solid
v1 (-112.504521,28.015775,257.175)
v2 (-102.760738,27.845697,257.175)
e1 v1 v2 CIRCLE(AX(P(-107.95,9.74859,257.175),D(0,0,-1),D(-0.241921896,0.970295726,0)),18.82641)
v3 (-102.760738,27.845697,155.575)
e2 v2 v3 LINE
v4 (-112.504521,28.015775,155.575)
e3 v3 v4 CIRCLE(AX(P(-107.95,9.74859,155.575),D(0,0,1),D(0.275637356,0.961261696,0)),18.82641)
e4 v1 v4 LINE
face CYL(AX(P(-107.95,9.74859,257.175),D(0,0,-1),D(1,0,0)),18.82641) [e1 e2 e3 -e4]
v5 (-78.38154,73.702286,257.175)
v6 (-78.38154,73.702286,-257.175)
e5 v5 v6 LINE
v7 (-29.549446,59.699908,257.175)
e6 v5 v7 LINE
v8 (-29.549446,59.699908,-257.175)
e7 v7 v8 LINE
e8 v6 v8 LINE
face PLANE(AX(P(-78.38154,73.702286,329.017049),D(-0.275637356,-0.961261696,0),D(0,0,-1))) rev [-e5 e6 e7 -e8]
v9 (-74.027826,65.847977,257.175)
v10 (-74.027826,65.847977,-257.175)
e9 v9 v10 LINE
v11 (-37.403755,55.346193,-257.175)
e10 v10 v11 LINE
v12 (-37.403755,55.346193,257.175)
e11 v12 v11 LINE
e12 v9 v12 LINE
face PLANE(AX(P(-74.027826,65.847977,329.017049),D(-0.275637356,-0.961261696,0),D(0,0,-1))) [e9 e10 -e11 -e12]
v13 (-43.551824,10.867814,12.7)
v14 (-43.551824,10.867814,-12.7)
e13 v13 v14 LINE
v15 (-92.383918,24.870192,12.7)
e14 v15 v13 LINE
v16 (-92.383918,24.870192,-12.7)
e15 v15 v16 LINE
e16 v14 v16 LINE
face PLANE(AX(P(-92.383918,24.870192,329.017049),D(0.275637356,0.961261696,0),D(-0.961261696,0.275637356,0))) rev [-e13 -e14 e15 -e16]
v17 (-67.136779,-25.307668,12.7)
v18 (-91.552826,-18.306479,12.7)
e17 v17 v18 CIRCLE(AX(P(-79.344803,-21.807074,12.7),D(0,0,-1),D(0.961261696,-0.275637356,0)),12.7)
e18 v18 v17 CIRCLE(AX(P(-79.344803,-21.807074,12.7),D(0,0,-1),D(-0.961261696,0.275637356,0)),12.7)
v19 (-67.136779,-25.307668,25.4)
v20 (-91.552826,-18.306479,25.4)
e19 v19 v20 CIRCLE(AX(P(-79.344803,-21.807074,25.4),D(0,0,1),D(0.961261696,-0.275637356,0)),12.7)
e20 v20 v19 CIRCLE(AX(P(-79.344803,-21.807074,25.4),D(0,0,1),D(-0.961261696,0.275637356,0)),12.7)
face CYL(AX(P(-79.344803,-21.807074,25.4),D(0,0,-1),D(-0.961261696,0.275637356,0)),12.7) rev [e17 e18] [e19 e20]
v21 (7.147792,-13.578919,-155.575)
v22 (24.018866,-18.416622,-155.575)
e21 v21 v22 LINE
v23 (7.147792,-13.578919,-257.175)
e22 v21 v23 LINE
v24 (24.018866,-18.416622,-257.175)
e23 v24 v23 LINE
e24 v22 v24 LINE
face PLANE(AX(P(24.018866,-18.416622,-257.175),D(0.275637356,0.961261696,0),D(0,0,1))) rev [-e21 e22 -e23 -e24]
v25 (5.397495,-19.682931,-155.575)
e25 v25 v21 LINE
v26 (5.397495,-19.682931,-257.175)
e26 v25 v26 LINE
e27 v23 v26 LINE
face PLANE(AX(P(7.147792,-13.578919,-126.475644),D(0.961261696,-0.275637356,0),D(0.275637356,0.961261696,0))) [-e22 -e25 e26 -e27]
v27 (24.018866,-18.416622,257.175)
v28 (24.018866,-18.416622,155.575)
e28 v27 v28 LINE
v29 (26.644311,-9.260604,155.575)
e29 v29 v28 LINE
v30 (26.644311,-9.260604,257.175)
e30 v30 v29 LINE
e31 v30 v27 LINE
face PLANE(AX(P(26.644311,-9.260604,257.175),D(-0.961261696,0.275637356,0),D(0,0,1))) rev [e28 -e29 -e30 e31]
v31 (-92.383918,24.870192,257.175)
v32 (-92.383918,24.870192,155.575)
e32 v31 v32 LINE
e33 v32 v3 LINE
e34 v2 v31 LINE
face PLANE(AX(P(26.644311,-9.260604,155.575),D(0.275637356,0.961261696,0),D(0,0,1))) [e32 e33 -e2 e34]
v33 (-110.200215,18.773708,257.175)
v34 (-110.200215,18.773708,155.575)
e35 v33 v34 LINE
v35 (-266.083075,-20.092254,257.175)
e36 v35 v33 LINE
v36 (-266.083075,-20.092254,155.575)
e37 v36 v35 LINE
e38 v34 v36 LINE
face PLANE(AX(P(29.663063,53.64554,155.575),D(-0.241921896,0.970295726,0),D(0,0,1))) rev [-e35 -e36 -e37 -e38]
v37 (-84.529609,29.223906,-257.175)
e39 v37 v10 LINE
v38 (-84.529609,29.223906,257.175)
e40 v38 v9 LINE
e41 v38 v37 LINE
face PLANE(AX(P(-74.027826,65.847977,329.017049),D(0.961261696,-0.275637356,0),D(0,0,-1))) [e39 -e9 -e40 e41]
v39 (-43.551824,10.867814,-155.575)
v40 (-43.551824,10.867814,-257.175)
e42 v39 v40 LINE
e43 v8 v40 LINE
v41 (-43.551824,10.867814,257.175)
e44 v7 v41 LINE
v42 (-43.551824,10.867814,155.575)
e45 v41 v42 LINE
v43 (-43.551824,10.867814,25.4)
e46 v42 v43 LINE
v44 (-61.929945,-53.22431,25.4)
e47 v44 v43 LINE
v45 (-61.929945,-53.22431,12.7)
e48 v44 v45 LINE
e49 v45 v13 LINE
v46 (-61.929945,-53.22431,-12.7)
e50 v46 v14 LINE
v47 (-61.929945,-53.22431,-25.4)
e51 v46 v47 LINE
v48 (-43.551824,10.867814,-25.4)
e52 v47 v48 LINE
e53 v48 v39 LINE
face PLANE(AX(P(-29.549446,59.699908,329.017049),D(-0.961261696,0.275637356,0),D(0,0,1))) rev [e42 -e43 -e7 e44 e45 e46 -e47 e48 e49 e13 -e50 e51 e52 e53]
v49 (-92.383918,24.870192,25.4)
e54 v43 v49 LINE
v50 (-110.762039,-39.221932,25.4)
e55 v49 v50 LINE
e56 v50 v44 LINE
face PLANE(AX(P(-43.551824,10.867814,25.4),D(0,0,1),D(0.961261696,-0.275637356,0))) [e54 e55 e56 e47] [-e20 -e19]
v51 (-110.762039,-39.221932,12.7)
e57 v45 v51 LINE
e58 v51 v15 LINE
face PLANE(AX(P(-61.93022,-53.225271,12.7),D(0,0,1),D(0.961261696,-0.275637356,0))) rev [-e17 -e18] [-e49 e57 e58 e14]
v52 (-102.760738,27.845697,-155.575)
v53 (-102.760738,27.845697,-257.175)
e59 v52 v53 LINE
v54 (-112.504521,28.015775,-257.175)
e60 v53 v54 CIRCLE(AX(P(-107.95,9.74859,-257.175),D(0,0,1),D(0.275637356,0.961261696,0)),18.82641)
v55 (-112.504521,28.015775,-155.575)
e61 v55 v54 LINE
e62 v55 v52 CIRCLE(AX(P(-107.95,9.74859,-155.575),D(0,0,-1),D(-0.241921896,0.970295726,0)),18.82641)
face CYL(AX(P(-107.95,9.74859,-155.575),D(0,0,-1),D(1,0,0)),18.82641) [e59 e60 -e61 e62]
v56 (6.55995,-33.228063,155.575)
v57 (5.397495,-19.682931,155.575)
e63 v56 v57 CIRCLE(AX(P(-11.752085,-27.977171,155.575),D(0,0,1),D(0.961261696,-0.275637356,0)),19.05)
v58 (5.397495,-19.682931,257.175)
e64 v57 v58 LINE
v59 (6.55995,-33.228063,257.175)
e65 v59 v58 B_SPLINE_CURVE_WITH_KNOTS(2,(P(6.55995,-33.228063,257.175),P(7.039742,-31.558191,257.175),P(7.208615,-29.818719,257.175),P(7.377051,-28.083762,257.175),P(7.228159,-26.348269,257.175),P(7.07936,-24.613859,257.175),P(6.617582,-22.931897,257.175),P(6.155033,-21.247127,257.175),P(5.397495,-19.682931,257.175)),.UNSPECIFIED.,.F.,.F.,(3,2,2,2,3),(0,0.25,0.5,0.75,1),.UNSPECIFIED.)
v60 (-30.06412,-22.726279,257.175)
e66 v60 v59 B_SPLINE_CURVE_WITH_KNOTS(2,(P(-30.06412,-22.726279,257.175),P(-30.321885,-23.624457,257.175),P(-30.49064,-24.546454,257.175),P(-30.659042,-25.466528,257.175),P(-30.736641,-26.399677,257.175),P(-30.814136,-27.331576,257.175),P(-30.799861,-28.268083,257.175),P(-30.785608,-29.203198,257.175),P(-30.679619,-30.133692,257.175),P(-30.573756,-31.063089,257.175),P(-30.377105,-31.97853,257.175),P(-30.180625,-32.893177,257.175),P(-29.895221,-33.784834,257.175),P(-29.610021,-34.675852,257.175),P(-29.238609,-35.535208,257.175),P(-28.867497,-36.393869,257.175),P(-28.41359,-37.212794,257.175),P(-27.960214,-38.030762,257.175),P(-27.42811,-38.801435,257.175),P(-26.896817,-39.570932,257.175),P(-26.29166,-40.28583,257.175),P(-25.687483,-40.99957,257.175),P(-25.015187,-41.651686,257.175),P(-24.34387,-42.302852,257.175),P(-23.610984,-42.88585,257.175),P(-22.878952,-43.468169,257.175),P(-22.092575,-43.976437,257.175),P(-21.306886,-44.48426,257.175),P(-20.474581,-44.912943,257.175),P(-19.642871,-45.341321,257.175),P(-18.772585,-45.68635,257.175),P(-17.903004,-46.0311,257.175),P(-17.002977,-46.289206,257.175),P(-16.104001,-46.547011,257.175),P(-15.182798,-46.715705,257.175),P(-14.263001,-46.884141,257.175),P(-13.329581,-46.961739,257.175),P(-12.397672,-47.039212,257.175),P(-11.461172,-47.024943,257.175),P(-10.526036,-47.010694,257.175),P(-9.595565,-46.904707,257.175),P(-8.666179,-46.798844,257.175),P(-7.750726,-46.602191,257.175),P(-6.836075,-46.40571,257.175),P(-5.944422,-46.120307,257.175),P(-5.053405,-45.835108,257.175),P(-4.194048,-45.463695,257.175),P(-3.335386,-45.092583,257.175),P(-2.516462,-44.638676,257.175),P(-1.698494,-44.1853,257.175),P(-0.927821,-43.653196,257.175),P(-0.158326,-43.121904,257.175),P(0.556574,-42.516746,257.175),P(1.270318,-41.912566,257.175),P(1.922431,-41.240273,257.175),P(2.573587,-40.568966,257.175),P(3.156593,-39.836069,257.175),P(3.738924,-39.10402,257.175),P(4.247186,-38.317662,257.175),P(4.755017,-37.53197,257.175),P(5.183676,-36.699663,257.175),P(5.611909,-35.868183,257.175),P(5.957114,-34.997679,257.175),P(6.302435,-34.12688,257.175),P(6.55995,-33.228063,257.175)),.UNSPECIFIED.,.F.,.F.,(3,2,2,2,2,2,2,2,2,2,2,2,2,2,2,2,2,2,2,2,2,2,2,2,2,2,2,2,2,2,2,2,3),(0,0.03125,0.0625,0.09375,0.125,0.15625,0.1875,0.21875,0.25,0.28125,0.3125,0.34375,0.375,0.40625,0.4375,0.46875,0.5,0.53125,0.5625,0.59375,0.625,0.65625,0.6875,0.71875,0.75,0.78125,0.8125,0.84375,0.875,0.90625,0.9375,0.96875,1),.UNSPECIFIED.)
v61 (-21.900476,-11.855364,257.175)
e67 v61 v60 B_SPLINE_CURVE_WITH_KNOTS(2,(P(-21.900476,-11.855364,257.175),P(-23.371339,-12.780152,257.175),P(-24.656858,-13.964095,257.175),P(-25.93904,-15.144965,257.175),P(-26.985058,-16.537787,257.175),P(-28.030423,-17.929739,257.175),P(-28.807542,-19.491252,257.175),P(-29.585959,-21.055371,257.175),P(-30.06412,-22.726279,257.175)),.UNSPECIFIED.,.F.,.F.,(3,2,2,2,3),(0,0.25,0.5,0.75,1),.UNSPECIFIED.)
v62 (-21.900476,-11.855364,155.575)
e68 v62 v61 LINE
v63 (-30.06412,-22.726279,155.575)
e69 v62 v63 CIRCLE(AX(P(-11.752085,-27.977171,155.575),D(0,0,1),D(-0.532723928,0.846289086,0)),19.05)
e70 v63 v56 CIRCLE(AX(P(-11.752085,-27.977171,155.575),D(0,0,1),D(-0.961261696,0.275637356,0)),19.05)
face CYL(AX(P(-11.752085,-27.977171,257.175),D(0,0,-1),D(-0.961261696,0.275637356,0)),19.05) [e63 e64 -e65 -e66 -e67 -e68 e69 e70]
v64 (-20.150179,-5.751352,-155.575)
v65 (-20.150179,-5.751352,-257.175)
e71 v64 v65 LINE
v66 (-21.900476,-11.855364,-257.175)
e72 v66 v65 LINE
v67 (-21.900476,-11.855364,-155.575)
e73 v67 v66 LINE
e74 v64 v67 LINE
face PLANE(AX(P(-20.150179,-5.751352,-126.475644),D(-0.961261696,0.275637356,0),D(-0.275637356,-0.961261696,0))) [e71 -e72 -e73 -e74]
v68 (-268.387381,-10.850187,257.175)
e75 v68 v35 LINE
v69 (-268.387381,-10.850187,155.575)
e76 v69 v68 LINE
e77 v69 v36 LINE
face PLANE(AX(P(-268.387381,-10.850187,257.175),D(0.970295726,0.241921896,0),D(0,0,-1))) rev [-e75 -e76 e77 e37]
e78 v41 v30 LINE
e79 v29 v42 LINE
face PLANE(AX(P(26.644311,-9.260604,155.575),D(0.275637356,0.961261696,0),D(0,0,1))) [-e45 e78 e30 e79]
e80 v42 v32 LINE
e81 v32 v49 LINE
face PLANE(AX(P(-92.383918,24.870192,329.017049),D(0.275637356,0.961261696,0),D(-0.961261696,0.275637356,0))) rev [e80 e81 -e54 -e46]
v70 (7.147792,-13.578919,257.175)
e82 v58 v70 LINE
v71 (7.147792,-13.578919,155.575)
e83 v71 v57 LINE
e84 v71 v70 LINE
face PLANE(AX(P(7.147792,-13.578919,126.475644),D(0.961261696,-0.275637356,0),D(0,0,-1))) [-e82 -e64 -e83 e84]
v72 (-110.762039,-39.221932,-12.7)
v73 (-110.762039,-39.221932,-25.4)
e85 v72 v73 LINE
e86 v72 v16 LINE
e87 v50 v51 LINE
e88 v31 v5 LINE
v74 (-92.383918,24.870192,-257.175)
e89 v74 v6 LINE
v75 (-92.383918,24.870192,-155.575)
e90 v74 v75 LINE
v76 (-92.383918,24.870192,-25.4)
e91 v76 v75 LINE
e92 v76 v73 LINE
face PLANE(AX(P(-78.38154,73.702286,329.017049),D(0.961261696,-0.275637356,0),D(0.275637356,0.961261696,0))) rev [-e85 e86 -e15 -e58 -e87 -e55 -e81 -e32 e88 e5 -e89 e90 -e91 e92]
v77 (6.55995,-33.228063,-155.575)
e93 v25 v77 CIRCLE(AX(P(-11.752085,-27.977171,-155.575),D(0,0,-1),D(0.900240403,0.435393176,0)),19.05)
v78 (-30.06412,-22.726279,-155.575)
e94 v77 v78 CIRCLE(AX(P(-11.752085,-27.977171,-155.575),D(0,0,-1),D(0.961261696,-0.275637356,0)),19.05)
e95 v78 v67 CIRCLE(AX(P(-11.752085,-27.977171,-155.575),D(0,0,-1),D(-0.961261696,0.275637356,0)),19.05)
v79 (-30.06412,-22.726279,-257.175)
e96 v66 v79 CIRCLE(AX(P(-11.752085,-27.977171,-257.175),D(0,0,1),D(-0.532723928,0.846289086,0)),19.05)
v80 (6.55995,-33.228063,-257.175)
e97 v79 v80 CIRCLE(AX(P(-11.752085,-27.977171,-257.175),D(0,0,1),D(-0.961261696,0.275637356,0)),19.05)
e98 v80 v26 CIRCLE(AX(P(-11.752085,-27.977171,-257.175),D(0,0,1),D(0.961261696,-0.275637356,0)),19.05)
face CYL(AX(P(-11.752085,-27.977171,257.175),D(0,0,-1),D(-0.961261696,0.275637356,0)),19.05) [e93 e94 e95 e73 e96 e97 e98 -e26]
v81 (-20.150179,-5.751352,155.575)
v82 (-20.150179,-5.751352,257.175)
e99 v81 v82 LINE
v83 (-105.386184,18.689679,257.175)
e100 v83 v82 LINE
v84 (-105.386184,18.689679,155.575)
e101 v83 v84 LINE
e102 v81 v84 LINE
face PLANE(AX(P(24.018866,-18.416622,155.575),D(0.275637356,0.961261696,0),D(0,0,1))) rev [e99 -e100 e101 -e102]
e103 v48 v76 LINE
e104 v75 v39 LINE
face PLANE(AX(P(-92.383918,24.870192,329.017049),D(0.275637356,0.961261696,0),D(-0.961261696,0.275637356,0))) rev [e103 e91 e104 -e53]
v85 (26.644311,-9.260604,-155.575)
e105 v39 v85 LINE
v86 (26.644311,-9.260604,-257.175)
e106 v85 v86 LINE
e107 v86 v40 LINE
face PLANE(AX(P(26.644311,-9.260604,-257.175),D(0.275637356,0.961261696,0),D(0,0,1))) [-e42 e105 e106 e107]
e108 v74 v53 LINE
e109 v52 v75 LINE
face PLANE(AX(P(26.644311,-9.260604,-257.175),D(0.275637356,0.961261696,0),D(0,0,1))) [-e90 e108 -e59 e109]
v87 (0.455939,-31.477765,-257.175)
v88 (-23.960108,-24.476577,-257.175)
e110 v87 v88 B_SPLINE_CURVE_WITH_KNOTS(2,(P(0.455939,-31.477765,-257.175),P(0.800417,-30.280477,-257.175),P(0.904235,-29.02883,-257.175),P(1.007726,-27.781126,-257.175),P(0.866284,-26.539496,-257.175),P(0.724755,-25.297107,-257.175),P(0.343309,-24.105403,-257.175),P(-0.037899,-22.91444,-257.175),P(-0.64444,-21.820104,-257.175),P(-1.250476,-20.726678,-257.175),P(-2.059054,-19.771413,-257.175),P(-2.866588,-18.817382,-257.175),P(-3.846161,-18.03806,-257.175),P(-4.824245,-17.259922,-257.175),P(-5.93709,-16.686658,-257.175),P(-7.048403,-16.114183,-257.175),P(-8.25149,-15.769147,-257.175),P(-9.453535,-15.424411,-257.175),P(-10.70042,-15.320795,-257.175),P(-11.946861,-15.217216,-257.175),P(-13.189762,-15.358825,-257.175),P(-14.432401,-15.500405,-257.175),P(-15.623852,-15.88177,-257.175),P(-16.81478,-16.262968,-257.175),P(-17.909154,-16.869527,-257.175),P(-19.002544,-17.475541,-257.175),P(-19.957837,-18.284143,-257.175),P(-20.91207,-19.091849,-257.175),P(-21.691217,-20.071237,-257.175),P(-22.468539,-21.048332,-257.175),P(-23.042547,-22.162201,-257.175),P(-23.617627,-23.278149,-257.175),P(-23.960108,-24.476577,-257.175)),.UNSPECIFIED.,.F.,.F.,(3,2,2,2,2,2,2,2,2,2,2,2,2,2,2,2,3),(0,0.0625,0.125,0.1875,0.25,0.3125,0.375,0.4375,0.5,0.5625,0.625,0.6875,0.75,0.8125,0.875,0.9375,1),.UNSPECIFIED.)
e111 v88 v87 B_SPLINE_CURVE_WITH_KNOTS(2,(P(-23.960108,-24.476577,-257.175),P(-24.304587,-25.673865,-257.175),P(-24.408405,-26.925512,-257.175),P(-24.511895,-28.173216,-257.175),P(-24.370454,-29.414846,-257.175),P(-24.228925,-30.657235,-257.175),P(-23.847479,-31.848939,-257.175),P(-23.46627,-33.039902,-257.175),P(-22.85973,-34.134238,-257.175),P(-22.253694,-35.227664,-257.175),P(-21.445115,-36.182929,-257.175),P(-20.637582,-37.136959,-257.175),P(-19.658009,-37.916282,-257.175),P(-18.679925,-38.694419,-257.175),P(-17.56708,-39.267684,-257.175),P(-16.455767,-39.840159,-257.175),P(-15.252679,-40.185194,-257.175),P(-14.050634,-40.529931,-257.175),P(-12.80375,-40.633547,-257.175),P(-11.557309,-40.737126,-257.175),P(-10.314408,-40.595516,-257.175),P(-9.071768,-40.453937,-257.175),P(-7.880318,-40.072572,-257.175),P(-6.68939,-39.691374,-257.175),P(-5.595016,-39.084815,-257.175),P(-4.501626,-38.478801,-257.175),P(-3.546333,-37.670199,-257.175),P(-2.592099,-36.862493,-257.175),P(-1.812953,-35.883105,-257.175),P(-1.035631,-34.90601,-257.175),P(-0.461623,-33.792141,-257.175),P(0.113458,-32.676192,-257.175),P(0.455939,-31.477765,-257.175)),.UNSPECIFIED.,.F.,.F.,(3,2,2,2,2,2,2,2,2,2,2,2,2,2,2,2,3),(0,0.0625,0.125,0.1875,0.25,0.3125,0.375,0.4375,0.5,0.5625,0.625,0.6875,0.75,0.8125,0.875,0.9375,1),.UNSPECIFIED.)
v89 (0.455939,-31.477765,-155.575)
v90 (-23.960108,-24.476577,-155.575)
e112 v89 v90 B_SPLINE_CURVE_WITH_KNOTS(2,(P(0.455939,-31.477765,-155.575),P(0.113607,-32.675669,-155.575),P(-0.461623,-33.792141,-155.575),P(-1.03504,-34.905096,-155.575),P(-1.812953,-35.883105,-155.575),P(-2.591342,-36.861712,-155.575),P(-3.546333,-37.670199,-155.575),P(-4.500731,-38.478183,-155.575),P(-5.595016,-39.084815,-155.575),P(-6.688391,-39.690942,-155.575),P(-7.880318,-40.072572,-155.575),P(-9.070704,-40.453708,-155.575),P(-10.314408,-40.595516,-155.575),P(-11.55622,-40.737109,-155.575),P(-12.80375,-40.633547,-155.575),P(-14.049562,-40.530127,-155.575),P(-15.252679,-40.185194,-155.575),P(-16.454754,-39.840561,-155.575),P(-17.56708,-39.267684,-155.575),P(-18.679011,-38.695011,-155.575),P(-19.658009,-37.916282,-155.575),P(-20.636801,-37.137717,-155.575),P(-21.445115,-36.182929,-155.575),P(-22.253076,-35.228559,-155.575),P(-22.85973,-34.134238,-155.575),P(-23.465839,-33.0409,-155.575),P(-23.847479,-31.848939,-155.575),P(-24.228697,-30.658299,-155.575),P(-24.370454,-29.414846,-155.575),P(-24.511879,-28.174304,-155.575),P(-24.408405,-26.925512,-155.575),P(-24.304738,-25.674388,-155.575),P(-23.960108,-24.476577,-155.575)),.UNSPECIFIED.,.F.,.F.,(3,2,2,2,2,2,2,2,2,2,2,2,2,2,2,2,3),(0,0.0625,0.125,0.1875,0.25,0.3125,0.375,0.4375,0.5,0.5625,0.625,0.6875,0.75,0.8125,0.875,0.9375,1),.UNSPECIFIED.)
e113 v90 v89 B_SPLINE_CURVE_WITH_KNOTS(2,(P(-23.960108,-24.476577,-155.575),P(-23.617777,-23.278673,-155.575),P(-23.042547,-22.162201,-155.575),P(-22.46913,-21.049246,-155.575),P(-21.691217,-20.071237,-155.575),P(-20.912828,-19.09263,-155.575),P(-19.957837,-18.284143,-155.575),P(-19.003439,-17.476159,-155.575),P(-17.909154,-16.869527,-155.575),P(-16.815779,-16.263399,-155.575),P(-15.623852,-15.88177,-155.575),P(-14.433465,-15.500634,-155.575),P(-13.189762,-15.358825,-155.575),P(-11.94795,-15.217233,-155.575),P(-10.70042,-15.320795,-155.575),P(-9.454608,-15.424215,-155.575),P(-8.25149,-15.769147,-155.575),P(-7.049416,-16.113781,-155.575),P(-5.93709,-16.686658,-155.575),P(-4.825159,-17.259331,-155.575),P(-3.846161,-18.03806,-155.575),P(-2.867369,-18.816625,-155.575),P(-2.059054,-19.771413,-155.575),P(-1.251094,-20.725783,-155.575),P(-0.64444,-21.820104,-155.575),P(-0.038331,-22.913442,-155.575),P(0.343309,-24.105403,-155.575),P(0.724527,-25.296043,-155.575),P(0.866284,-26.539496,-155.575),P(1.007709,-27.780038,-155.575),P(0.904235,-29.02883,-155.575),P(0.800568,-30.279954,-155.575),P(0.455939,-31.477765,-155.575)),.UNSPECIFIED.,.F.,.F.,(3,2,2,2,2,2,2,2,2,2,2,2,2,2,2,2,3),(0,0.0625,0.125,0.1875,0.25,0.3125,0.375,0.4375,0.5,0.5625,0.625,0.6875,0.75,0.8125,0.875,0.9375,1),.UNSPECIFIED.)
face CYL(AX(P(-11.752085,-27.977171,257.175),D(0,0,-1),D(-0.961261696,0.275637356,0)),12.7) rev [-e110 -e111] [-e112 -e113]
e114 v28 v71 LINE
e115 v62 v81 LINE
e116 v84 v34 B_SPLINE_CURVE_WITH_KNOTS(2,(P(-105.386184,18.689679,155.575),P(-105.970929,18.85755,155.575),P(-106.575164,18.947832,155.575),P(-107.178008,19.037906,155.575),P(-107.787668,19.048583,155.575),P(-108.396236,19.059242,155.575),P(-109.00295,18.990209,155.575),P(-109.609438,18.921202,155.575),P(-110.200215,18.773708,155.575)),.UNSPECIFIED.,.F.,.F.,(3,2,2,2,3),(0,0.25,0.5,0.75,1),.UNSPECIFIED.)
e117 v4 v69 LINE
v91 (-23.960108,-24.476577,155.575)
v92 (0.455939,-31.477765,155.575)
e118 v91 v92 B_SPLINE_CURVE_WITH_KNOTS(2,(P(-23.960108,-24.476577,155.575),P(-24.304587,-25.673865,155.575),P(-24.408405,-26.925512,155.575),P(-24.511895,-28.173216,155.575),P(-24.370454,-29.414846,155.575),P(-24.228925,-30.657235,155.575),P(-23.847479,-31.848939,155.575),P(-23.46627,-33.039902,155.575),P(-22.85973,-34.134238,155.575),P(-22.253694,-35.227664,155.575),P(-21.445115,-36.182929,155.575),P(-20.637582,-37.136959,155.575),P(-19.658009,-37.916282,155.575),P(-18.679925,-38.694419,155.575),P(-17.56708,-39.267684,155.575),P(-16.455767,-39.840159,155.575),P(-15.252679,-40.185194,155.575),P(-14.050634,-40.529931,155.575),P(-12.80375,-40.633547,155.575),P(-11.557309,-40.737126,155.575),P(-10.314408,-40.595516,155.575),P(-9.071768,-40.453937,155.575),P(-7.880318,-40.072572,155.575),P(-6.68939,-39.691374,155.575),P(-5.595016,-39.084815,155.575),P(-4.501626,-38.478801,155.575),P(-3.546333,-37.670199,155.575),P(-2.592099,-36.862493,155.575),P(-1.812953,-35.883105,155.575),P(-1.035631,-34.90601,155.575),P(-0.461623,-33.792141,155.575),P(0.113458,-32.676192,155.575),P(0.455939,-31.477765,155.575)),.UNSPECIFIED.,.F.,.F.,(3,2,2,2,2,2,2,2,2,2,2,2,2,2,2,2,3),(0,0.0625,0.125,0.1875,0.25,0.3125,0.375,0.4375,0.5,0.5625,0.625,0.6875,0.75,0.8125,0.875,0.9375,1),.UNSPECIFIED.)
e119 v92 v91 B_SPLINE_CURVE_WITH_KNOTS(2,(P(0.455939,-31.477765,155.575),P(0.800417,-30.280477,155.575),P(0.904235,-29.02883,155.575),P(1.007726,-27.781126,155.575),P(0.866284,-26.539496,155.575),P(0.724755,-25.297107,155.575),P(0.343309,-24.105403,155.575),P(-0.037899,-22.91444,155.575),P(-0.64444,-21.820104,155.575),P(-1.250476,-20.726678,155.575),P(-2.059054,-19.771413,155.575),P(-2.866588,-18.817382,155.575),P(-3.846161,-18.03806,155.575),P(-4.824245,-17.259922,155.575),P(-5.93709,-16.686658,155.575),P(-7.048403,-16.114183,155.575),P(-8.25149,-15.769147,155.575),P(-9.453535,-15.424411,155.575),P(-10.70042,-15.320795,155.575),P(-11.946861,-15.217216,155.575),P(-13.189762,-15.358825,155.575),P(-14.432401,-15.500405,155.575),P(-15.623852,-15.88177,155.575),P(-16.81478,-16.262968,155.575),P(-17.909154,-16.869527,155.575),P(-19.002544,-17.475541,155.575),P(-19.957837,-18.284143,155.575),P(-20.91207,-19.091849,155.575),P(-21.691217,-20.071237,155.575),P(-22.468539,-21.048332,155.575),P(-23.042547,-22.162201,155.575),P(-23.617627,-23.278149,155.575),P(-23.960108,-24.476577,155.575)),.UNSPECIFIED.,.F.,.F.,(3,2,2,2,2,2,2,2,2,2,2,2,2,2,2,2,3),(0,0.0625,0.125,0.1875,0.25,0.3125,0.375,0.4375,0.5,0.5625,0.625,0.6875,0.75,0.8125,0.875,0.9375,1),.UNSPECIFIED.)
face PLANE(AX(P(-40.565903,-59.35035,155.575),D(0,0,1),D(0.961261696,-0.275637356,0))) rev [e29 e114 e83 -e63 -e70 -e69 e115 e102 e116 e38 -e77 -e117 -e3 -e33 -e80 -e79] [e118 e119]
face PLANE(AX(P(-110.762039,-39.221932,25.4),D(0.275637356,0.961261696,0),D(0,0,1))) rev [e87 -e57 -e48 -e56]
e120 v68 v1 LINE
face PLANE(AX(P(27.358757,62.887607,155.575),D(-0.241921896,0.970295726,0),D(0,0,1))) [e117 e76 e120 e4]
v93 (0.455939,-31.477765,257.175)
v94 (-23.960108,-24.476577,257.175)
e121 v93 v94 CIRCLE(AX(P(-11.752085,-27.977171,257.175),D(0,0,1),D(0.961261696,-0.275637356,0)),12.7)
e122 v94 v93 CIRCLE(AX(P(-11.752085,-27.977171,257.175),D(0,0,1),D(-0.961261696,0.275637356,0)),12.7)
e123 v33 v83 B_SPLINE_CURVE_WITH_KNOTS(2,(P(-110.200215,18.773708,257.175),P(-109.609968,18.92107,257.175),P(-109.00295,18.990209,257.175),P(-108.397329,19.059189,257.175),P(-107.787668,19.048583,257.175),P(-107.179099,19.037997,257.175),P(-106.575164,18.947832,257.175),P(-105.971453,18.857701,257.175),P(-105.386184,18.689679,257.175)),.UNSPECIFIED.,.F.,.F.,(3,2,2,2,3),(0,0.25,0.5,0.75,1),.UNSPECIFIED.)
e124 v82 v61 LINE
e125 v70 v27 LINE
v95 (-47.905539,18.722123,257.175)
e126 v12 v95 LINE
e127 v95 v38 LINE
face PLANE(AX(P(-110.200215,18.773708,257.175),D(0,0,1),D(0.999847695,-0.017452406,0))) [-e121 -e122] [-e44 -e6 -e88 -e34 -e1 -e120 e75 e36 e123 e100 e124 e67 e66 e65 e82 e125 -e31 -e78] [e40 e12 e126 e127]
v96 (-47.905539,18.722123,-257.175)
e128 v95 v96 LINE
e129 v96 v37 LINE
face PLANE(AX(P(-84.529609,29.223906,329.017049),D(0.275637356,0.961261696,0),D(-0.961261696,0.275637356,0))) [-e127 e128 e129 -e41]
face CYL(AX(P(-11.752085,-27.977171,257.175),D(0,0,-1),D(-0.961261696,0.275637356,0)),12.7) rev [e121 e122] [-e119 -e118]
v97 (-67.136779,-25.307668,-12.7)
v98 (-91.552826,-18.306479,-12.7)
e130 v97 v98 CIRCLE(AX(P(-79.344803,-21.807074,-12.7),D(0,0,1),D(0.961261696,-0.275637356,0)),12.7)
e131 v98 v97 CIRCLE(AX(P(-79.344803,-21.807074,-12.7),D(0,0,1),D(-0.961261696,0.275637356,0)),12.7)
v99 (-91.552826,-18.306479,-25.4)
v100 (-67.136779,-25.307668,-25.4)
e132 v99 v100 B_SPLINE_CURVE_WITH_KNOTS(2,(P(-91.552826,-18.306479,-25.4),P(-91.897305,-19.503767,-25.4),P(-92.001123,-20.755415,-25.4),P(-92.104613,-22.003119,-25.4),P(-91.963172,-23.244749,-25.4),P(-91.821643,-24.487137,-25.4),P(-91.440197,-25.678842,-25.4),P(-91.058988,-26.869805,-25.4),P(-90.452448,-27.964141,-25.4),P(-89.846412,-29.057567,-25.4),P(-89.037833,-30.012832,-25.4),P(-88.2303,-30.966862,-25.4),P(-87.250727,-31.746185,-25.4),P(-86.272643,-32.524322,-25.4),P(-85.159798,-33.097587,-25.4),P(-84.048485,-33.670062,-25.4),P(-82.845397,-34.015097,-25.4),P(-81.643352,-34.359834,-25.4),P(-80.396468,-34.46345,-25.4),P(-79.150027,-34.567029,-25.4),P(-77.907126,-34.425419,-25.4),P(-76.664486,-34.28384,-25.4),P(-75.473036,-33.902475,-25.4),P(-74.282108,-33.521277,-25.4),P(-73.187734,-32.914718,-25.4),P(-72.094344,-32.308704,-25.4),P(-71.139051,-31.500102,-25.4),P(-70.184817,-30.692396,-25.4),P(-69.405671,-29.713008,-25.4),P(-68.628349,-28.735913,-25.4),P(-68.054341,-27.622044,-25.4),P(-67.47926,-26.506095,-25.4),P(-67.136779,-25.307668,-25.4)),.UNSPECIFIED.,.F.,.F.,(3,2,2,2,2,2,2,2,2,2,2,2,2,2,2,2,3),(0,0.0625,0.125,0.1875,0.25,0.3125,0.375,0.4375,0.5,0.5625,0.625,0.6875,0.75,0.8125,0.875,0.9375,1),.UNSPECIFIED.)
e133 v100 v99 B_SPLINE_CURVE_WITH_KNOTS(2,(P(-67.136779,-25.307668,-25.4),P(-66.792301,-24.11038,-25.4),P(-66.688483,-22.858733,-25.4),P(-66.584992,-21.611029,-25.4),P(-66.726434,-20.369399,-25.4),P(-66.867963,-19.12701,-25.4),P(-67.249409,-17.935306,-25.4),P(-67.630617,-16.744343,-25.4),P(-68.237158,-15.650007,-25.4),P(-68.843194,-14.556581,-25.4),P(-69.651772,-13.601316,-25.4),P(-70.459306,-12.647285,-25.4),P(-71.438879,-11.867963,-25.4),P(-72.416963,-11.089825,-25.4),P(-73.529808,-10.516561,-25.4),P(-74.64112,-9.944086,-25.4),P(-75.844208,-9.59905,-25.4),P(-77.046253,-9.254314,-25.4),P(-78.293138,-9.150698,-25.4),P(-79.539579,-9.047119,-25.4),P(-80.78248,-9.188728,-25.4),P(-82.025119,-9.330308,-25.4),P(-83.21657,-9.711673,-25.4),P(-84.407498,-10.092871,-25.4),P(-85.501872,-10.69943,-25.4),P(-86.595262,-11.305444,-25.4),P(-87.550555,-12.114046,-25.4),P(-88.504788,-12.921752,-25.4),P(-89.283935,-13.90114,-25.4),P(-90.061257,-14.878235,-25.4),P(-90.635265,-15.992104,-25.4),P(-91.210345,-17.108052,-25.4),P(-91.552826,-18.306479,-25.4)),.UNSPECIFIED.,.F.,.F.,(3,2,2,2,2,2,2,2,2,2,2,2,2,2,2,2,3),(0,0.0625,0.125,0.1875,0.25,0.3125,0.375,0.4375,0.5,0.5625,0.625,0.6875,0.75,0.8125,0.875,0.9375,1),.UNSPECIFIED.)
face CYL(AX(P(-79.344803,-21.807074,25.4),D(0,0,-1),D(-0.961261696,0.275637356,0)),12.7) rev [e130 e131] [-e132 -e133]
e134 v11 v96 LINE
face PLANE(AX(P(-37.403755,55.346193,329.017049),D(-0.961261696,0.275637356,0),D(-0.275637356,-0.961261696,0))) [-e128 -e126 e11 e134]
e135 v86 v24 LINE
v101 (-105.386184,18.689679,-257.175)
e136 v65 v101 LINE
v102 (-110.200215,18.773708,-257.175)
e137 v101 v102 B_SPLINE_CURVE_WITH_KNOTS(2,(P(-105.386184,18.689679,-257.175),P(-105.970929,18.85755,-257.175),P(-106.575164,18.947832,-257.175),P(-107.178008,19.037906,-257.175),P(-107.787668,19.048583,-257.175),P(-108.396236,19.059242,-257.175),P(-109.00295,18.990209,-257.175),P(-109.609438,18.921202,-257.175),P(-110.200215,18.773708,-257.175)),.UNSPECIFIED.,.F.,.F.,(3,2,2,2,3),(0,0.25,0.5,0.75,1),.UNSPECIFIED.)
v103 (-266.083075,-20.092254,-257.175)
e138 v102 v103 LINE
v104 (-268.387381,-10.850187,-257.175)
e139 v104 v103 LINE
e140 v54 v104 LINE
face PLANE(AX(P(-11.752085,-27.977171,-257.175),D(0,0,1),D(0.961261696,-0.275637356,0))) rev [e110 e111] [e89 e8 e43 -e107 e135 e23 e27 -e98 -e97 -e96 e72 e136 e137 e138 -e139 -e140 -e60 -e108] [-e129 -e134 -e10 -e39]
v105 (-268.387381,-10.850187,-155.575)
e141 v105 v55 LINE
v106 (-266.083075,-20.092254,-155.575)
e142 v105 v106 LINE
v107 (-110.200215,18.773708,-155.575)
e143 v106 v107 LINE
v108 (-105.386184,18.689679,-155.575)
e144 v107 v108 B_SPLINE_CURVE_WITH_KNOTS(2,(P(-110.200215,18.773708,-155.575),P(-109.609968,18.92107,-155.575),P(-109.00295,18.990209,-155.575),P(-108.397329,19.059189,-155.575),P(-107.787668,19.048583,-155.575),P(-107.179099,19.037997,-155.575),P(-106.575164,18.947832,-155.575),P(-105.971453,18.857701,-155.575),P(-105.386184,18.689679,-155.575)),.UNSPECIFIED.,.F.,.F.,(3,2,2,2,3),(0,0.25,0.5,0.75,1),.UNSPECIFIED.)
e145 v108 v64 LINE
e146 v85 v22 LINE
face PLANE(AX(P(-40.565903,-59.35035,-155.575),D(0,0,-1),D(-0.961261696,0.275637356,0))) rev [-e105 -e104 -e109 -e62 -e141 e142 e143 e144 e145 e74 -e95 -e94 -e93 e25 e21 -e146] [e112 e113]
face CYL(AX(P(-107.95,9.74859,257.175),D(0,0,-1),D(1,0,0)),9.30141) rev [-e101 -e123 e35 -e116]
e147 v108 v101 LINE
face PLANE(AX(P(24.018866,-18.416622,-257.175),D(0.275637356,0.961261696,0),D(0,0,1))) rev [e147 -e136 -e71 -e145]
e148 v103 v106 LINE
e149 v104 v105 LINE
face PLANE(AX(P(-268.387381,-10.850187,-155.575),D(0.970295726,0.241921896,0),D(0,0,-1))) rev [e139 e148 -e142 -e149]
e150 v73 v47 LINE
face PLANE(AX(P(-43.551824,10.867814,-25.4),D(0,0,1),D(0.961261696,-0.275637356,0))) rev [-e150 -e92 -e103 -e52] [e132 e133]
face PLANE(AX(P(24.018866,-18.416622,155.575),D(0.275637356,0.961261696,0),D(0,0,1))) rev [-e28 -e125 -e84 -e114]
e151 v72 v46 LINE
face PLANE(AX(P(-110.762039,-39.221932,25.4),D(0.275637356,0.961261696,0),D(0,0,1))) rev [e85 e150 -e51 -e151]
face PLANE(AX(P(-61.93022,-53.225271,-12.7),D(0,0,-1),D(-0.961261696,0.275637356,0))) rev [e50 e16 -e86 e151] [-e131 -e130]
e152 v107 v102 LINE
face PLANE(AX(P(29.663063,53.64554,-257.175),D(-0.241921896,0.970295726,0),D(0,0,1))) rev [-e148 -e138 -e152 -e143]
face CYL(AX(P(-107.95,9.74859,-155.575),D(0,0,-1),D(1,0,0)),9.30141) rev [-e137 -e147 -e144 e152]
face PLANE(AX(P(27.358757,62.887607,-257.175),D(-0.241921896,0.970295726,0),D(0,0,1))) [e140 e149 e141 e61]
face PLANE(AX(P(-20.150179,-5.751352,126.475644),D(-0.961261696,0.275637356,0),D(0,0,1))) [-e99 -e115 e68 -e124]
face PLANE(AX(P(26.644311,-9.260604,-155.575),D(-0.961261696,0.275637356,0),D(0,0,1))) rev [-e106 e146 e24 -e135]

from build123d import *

# Parameters (mm, degrees)
SKETCH1_R               = 19.05
SKETCH1_R_2             = 12.7
EXTRUDE1_DEPTH          = 257.175
SKETCH2_W               = 304.8
SKETCH2_H               = 101.6
EXTRUDE2_DEPTH          = 9.525
EXTRUDE2_2_DEPTH        = 9.525
SKETCH3_W               = 50.8
SKETCH3_H               = 66.675
SKETCH3_R               = 12.7
EXTRUDE3_DEPTH          = 25.4
SKETCH4_W               = 50.8
SKETCH4_H               = 25.4
CUT_EXTRUDE1_DEPTH      = 66.675
CUT_EXTRUDE2_DEPTH      = 378.023730188
CUT_EXTRUDE2_DEPTH_BACK = 378.023730188
SKETCH5_W               = 38.1
SKETCH5_H               = 311.15
EXTRUDE4_START          = -257.175
SKETCH7_W               = 50.8
SKETCH7_H               = 50.8
SKETCH7_W_2             = 38.1
SKETCH7_H_2             = 38.1
EXTRUDE4_DEPTH          = 514.35
SKETCH9_W               = 28.398063314
SKETCH9_H               = 6.35
EXTRUDE5_DEPTH          = 101.6
SKETCH10_W              = 28.398063314
SKETCH10_H              = 6.35
EXTRUDE6_DEPTH          = 101.6
FLEX1_START             = -257.175
FLEX1_DEPTH             = 514.35
FLEX1_START_2           = -25.4
FLEX1_2_DEPTH           = 50.8
FLEX1_3_DEPTH           = 514.35
FLEX1_4_DEPTH           = 101.6
FLEX1_START_3           = 155.575
FLEX1_5_DEPTH           = 101.6
FLEX1_6_DEPTH           = 12.7
FLEX1_START_4           = 12.7
FLEX1_7_DEPTH           = 12.7


# Read off the part's stored shape, not the designer's step: Flex1
with BuildPart() as part:
    # Sketch1 → Extrude1 (new, symmetric)
    with BuildSketch(Plane.XY):
        Circle(SKETCH1_R)
        Circle(SKETCH1_R_2, mode=Mode.SUBTRACT)
    extrude(amount=EXTRUDE1_DEPTH, both=True)

    # Sketch5 → Cut-Extrude2 (cut, two sides: drawn at the far end of the back side and taken through both)
    with BuildSketch(Plane(origin=(0, 0, 0), x_dir=(1, 0, 0), z_dir=(0, 1, 0)).offset(-CUT_EXTRUDE2_DEPTH_BACK)):
        Rectangle(SKETCH5_W, SKETCH5_H)
    extrude(amount=CUT_EXTRUDE2_DEPTH + CUT_EXTRUDE2_DEPTH_BACK, mode=Mode.SUBTRACT)


with BuildPart() as body_2:
    # Sketch2 → Extrude2 (new body)
    with BuildSketch(Plane(origin=(0, 19.05, 0), x_dir=(-1, 0, 0), z_dir=(0, 1, 0))):
        with Locations((120.65, 206.375)):
            Rectangle(SKETCH2_W, SKETCH2_H)
    extrude(amount=EXTRUDE2_DEPTH)



with BuildPart() as body_3:
    # Sketch2 → Extrude2 2 (new body)
    with BuildSketch(Plane(origin=(0, 19.05, 0), x_dir=(-1, 0, 0), z_dir=(0, 1, 0))):
        with Locations((120.65, -206.375)):
            Rectangle(SKETCH2_W, SKETCH2_H)
    extrude(amount=EXTRUDE2_2_DEPTH)


with BuildPart() as body_4:
    # Sketch3 → Extrude3 (new, symmetric)
    with BuildSketch(Plane.XY):
        with Locations((-66.675, -4.7625)):
            Rectangle(SKETCH3_W, SKETCH3_H)
        with Locations((-66.675, -12.7)):
            Circle(SKETCH3_R, mode=Mode.SUBTRACT)
    extrude(amount=EXTRUDE3_DEPTH, both=True)

    # Sketch4 → Cut-Extrude1 (cut)
    with BuildSketch(Plane(origin=(0, 28.575, 0), x_dir=(-1, 0, 0), z_dir=(0, 1, 0))):
        with Locations((66.675, 0)):
            Rectangle(SKETCH4_W, SKETCH4_H)
    extrude(amount=-CUT_EXTRUDE1_DEPTH, mode=Mode.SUBTRACT)


with BuildPart() as cut_extrude1_piece_1:
    # of the separate pieces the step leaves, piece 1, a body of its own (cut_extrude1_pieces)
    add(body_4.part.solids().sort_by_distance((-92.075, 28.575, 25.4))[0])


with BuildPart() as cut_extrude1_piece_2:
    # of the separate pieces the step leaves, piece 2, a body of its own (cut_extrude1_pieces)
    add(body_4.part.solids().sort_by_distance((-92.075, 28.575, -12.7))[0])


with BuildPart() as cut_extrude2_piece_1:
    # of the separate pieces the step leaves, piece 1, a body of its own (cut_extrude2_pieces)
    add(part.part.solids().sort_by_distance((19.05, 0, 155.575))[0])


with BuildPart() as cut_extrude2_piece_2:
    # of the separate pieces the step leaves, piece 2, a body of its own (cut_extrude2_pieces)
    add(part.part.solids().sort_by_distance((19.05, 0, -257.175))[0])


with BuildPart() as body_2_1:
    add(body_2.part)

    add(body_3.part)  # Extrude4 merges body 3

    add(cut_extrude1_piece_1.part)  # Extrude4 merges Cut-Extrude1 piece 1

    add(cut_extrude1_piece_2.part)  # Extrude4 merges Cut-Extrude1 piece 2
    # Sketch7 → Extrude4 (add)
    with BuildSketch(Plane.XY.offset(EXTRUDE4_START)):
        with Locations((-66.675, 53.975)):
            Rectangle(SKETCH7_W, SKETCH7_H)
        with Locations((-66.675, 53.975)):
            Rectangle(SKETCH7_W_2, SKETCH7_H_2, mode=Mode.SUBTRACT)
    extrude(amount=EXTRUDE4_DEPTH)


    add(cut_extrude2_piece_1.part)  # Extrude5 merges Cut-Extrude2 piece 1
    # Sketch9 → Extrude5 (add)
    with BuildSketch(Plane.XY.offset(257.175)):
        with Locations((0, 15.875)):
            Rectangle(SKETCH9_W, SKETCH9_H)
    extrude(amount=-EXTRUDE5_DEPTH)


    add(cut_extrude2_piece_2.part)  # Extrude6 merges Cut-Extrude2 piece 2
    # Sketch10 → Extrude6 (add)
    with BuildSketch(Plane(origin=(0, 0, -257.175), x_dir=(-1, 0, 0), z_dir=(0, 0, -1))):
        with Locations((0, 15.875)):
            Rectangle(SKETCH10_W, SKETCH10_H)
    extrude(amount=-EXTRUDE6_DEPTH)

    # Flex1 outline → Flex1 (cut)
    with BuildSketch(Plane.XY.offset(FLEX1_START)):
        with BuildLine():
            Line((-148.464280876, 19.05), (-112.504520793, 28.015775164))
            ThreePointArc((-112.504520793, 28.015775164), (-110.244362224, 28.434670795), (-107.949999999, 28.575))
            Line((-107.949999999, 28.575), (-273.05, 28.575))
            Line((-273.05, 28.575), (-273.05, 19.05))
            Line((-273.05, 19.05), (-148.464280876, 19.05))
        make_face()
        with BuildLine():
            Line((-92.075, 28.575), (-107.949999999, 28.575))
            ThreePointArc((-107.949999999, 28.575), (-105.32987014, 28.391782672), (-102.760738129, 27.845696805))
            Line((-102.760738129, 27.845696805), (-92.383918122, 24.870191549))
            Line((-92.383918122, 24.870191549), (-85.725, 48.092598787))
            Line((-85.725, 48.092598787), (-85.725, 73.025))
            Line((-85.725, 73.025), (-78.575748996, 73.025))
            Line((-78.575748996, 73.025), (-78.381540446, 73.702285703))
            Line((-78.381540446, 73.702285703), (-76.019564503, 73.025))
            Line((-76.019564503, 73.025), (-47.625, 73.025))
            Line((-47.625, 73.025), (-47.625, 64.882989648))
            Line((-47.625, 64.882989648), (-41.275, 63.062156448))
            Line((-41.275, 63.062156448), (-41.275, 79.375))
            Line((-41.275, 79.375), (-92.075, 79.375))
            Line((-92.075, 79.375), (-92.075, 28.575))
        make_face()
        Polygon((-41.275, 41.845558685), (-41.275, 56.456255031), (-47.625, 58.277088231), (-47.625, 34.925), (-82.894846776, 34.925), (-84.529609143, 29.223906109), (-47.905538528, 18.722122852), align=None)
        Polygon((-41.275, 18.808042667), (-43.551823968, 10.867813874), (-41.275, 10.214945107), align=None)
        Polygon((-41.275, 0.30609298), (-46.177269782, 1.71179622), (-57.593118647, -38.1), (-41.275, -38.1), align=None)
        with BuildLine():
            Line((31.75, 28.575), (-38.474370052, 28.575))
            Line((-38.474370052, 28.575), (-41.205619851, 19.05))
            Line((-41.205619851, 19.05), (-14.199031657, 19.05))
            Line((-14.199031657, 19.05), (-14.199031657, 12.7))
            ThreePointArc((-14.199031657, 12.7), (-17.039583869, 8.517927071), (-18.680073508, 3.735954194))
            Line((-18.680073508, 3.735954194), (-12.545207206, 1.976809589))
            ThreePointArc((-12.545207206, 1.976809589), (3.500594419, 12.208023538), (11.68648857, -4.971517364))
            Line((11.68648857, -4.971517364), (17.821354872, -6.730661968))
            ThreePointArc((17.821354872, -6.730661968), (18.727358182, 3.49121118), (14.199031657, 12.7))
            Line((14.199031657, 12.7), (14.199031657, 19.05))
            Line((14.199031657, 19.05), (31.75, 19.05))
            Line((31.75, 19.05), (31.75, 28.575))
        make_face()
        with BuildLine():
            ThreePointArc((-2.952497042, -18.81981034), (-6.833637138, -16.268248219), (-11.372655614, -15.28284019))
            ThreePointArc((-11.372655614, -15.28284019), (-7.377671659, -17.563384096), (-2.952497042, -18.81981034))
        make_face()
        with BuildLine():
            Line((7.147791969, -13.578919183), (5.842203325, -18.13204788))
            ThreePointArc((5.842203325, -18.13204788), (8.985100393, -16.797930555), (11.839365268, -14.924206178))
            Line((11.839365268, -14.924206178), (7.147791969, -13.578919183))
        make_face()
        with BuildLine():
            ThreePointArc((-67.160894994, -25.390701559), (-76.987343342, -20.112528233), (-78.858907912, -9.116372229))
            ThreePointArc((-78.858907912, -9.116372229), (-89.657146248, -29.219602021), (-67.160894994, -25.390701559))
        make_face()
    extrude(amount=FLEX1_DEPTH, mode=Mode.SUBTRACT)

    # Flex1 2 outline → Flex1 2 (cut)
    with BuildSketch(Plane.XY.offset(FLEX1_START_2)):
        Polygon((-41.275, 10.214945107), (-43.551823968, 10.867813874), (-46.177269782, 1.71179622), (-41.275, 0.30609298), align=None)
    extrude(amount=FLEX1_2_DEPTH, mode=Mode.SUBTRACT)

    # Flex1 3 outline → Flex1 3 (add)
    with BuildSketch(Plane.XY.offset(FLEX1_START)):
        Polygon((-92.383918122, 24.870191549), (-43.551823968, 10.867813874), (-29.549446293, 59.699908027), (-41.275, 63.062156448), (-41.275, 56.456255031), (-37.403755271, 55.346193468), (-41.275, 41.845558685), (-41.275, 28.575), (-45.080271469, 28.575), (-47.905538528, 18.722122852), (-82.266604606, 28.575), (-91.321581393, 28.575), align=None)
        Polygon((-78.575748996, 73.025), (-85.725, 48.092598787), (-85.725, 34.925), (-82.894846776, 34.925), (-74.027825886, 65.847976724), (-47.625, 58.277088231), (-47.625, 64.882989648), (-76.019564503, 73.025), align=None)
    extrude(amount=FLEX1_3_DEPTH)

    # Flex1 4 outline → Flex1 4 (add)
    with BuildSketch(Plane.XY.offset(FLEX1_START)):
        with BuildLine():
            Line((-107.949999997, 19.05), (-148.464280876, 19.05))
            Line((-148.464280876, 19.05), (-268.387380698, -10.850186973))
            Line((-268.387380698, -10.850186973), (-266.083074643, -20.092253766))
            Line((-266.083074643, -20.092253766), (-110.200214738, 18.773708371))
            ThreePointArc((-110.200214738, 18.773708371), (-109.083556727, 18.9806687), (-107.949999997, 19.05))
        make_face()
        with BuildLine():
            ThreePointArc((-107.949999997, 19.05), (-106.655493926, 18.959479317), (-105.386183943, 18.689679151))
            Line((-105.386183943, 18.689679151), (-20.150178534, -5.7513521))
            Line((-20.150178534, -5.7513521), (-21.900475743, -11.85536387))
            ThreePointArc((-21.900475743, -11.85536387), (-17.002976538, -46.289206257), (5.39749476, -19.682930952))
            Line((5.39749476, -19.682930952), (5.842203325, -18.13204788))
            ThreePointArc((5.842203325, -18.13204788), (1.485212073, -18.992015299), (-2.952497042, -18.81981034))
            ThreePointArc((-2.952497042, -18.81981034), (-16.670532684, -39.686093679), (-11.372655614, -15.28284019))
            ThreePointArc((-11.372655614, -15.28284019), (-17.782583245, -6.832439764), (-18.680073508, 3.735954194))
            Line((-18.680073508, 3.735954194), (-43.551823968, 10.867813874))
            Line((-43.551823968, 10.867813874), (-72.086498047, 19.05))
            Line((-72.086498047, 19.05), (-107.949999997, 19.05))
        make_face()
        with BuildLine():
            Line((11.68648857, -4.971517364), (-12.545207206, 1.976809589))
            ThreePointArc((-12.545207206, 1.976809589), (-3.500594419, -12.208023538), (11.68648857, -4.971517364))
        make_face()
        with BuildLine():
            Line((26.644311378, -9.260604035), (17.821354872, -6.730661968))
            ThreePointArc((17.821354872, -6.730661968), (15.385809094, -11.232959473), (11.839365268, -14.924206178))
            Line((11.839365268, -14.924206178), (24.018865564, -18.416621689))
            Line((24.018865564, -18.416621689), (26.644311378, -9.260604035))
        make_face()
    extrude(amount=FLEX1_4_DEPTH)

    # Flex1 5 outline → Flex1 5 (add)
    with BuildSketch(Plane.XY.offset(FLEX1_START_3)):
        with BuildLine():
            Line((-107.949999997, 19.05), (-148.464280876, 19.05))
            Line((-148.464280876, 19.05), (-268.387380698, -10.850186973))
            Line((-268.387380698, -10.850186973), (-266.083074643, -20.092253766))
            Line((-266.083074643, -20.092253766), (-110.200214738, 18.773708371))
            ThreePointArc((-110.200214738, 18.773708371), (-109.083556727, 18.9806687), (-107.949999997, 19.05))
        make_face()
        with BuildLine():
            ThreePointArc((-107.949999997, 19.05), (-106.655493926, 18.959479317), (-105.386183943, 18.689679151))
            Line((-105.386183943, 18.689679151), (-20.150178534, -5.7513521))
            Line((-20.150178534, -5.7513521), (-21.900475743, -11.85536387))
            ThreePointArc((-21.900475743, -11.85536387), (-17.002976538, -46.289206257), (5.39749476, -19.682930952))
            Line((5.39749476, -19.682930952), (5.842203325, -18.13204788))
            ThreePointArc((5.842203325, -18.13204788), (1.485212073, -18.992015299), (-2.952497042, -18.81981034))
            ThreePointArc((-2.952497042, -18.81981034), (-16.670532684, -39.686093679), (-11.372655614, -15.28284019))
            ThreePointArc((-11.372655614, -15.28284019), (-17.782583245, -6.832439764), (-18.680073508, 3.735954194))
            Line((-18.680073508, 3.735954194), (-43.551823968, 10.867813874))
            Line((-43.551823968, 10.867813874), (-72.086498047, 19.05))
            Line((-72.086498047, 19.05), (-107.949999997, 19.05))
        make_face()
        with BuildLine():
            Line((11.68648857, -4.971517364), (-12.545207206, 1.976809589))
            ThreePointArc((-12.545207206, 1.976809589), (-3.500594419, -12.208023538), (11.68648857, -4.971517364))
        make_face()
        with BuildLine():
            Line((26.644311378, -9.260604035), (17.821354872, -6.730661968))
            ThreePointArc((17.821354872, -6.730661968), (15.385809094, -11.232959473), (11.839365268, -14.924206178))
            Line((11.839365268, -14.924206178), (24.018865564, -18.416621689))
            Line((24.018865564, -18.416621689), (26.644311378, -9.260604035))
        make_face()
    extrude(amount=FLEX1_5_DEPTH)

    # Flex1 6 outline → Flex1 6 (add)
    with BuildSketch(Plane.XY.offset(FLEX1_START_2)):
        Polygon((-92.075, 24.781610703), (-92.383918122, 24.870191549), (-110.762038821, -39.221932028), (-61.929944667, -53.224309703), (-57.593118647, -38.1), (-92.075, -38.1), align=None)
        with BuildLine():
            ThreePointArc((-78.858907912, -9.116372229), (-69.032459564, -14.394545555), (-67.160894994, -25.390701559))
            ThreePointArc((-67.160894994, -25.390701559), (-56.362656658, -5.287471767), (-78.858907912, -9.116372229))
        make_face()
    extrude(amount=FLEX1_6_DEPTH)

    # Flex1 7 outline → Flex1 7 (add)
    with BuildSketch(Plane.XY.offset(FLEX1_START_4)):
        Polygon((-92.075, 24.781610703), (-92.383918122, 24.870191549), (-110.762038821, -39.221932028), (-61.929944667, -53.224309703), (-57.593118647, -38.1), (-92.075, -38.1), align=None)
        with BuildLine():
            ThreePointArc((-78.858907912, -9.116372229), (-69.032459564, -14.394545555), (-67.160894994, -25.390701559))
            ThreePointArc((-67.160894994, -25.390701559), (-56.362656658, -5.287471767), (-78.858907912, -9.116372229))
        make_face()
    extrude(amount=FLEX1_7_DEPTH)


solid = body_2_1.part
